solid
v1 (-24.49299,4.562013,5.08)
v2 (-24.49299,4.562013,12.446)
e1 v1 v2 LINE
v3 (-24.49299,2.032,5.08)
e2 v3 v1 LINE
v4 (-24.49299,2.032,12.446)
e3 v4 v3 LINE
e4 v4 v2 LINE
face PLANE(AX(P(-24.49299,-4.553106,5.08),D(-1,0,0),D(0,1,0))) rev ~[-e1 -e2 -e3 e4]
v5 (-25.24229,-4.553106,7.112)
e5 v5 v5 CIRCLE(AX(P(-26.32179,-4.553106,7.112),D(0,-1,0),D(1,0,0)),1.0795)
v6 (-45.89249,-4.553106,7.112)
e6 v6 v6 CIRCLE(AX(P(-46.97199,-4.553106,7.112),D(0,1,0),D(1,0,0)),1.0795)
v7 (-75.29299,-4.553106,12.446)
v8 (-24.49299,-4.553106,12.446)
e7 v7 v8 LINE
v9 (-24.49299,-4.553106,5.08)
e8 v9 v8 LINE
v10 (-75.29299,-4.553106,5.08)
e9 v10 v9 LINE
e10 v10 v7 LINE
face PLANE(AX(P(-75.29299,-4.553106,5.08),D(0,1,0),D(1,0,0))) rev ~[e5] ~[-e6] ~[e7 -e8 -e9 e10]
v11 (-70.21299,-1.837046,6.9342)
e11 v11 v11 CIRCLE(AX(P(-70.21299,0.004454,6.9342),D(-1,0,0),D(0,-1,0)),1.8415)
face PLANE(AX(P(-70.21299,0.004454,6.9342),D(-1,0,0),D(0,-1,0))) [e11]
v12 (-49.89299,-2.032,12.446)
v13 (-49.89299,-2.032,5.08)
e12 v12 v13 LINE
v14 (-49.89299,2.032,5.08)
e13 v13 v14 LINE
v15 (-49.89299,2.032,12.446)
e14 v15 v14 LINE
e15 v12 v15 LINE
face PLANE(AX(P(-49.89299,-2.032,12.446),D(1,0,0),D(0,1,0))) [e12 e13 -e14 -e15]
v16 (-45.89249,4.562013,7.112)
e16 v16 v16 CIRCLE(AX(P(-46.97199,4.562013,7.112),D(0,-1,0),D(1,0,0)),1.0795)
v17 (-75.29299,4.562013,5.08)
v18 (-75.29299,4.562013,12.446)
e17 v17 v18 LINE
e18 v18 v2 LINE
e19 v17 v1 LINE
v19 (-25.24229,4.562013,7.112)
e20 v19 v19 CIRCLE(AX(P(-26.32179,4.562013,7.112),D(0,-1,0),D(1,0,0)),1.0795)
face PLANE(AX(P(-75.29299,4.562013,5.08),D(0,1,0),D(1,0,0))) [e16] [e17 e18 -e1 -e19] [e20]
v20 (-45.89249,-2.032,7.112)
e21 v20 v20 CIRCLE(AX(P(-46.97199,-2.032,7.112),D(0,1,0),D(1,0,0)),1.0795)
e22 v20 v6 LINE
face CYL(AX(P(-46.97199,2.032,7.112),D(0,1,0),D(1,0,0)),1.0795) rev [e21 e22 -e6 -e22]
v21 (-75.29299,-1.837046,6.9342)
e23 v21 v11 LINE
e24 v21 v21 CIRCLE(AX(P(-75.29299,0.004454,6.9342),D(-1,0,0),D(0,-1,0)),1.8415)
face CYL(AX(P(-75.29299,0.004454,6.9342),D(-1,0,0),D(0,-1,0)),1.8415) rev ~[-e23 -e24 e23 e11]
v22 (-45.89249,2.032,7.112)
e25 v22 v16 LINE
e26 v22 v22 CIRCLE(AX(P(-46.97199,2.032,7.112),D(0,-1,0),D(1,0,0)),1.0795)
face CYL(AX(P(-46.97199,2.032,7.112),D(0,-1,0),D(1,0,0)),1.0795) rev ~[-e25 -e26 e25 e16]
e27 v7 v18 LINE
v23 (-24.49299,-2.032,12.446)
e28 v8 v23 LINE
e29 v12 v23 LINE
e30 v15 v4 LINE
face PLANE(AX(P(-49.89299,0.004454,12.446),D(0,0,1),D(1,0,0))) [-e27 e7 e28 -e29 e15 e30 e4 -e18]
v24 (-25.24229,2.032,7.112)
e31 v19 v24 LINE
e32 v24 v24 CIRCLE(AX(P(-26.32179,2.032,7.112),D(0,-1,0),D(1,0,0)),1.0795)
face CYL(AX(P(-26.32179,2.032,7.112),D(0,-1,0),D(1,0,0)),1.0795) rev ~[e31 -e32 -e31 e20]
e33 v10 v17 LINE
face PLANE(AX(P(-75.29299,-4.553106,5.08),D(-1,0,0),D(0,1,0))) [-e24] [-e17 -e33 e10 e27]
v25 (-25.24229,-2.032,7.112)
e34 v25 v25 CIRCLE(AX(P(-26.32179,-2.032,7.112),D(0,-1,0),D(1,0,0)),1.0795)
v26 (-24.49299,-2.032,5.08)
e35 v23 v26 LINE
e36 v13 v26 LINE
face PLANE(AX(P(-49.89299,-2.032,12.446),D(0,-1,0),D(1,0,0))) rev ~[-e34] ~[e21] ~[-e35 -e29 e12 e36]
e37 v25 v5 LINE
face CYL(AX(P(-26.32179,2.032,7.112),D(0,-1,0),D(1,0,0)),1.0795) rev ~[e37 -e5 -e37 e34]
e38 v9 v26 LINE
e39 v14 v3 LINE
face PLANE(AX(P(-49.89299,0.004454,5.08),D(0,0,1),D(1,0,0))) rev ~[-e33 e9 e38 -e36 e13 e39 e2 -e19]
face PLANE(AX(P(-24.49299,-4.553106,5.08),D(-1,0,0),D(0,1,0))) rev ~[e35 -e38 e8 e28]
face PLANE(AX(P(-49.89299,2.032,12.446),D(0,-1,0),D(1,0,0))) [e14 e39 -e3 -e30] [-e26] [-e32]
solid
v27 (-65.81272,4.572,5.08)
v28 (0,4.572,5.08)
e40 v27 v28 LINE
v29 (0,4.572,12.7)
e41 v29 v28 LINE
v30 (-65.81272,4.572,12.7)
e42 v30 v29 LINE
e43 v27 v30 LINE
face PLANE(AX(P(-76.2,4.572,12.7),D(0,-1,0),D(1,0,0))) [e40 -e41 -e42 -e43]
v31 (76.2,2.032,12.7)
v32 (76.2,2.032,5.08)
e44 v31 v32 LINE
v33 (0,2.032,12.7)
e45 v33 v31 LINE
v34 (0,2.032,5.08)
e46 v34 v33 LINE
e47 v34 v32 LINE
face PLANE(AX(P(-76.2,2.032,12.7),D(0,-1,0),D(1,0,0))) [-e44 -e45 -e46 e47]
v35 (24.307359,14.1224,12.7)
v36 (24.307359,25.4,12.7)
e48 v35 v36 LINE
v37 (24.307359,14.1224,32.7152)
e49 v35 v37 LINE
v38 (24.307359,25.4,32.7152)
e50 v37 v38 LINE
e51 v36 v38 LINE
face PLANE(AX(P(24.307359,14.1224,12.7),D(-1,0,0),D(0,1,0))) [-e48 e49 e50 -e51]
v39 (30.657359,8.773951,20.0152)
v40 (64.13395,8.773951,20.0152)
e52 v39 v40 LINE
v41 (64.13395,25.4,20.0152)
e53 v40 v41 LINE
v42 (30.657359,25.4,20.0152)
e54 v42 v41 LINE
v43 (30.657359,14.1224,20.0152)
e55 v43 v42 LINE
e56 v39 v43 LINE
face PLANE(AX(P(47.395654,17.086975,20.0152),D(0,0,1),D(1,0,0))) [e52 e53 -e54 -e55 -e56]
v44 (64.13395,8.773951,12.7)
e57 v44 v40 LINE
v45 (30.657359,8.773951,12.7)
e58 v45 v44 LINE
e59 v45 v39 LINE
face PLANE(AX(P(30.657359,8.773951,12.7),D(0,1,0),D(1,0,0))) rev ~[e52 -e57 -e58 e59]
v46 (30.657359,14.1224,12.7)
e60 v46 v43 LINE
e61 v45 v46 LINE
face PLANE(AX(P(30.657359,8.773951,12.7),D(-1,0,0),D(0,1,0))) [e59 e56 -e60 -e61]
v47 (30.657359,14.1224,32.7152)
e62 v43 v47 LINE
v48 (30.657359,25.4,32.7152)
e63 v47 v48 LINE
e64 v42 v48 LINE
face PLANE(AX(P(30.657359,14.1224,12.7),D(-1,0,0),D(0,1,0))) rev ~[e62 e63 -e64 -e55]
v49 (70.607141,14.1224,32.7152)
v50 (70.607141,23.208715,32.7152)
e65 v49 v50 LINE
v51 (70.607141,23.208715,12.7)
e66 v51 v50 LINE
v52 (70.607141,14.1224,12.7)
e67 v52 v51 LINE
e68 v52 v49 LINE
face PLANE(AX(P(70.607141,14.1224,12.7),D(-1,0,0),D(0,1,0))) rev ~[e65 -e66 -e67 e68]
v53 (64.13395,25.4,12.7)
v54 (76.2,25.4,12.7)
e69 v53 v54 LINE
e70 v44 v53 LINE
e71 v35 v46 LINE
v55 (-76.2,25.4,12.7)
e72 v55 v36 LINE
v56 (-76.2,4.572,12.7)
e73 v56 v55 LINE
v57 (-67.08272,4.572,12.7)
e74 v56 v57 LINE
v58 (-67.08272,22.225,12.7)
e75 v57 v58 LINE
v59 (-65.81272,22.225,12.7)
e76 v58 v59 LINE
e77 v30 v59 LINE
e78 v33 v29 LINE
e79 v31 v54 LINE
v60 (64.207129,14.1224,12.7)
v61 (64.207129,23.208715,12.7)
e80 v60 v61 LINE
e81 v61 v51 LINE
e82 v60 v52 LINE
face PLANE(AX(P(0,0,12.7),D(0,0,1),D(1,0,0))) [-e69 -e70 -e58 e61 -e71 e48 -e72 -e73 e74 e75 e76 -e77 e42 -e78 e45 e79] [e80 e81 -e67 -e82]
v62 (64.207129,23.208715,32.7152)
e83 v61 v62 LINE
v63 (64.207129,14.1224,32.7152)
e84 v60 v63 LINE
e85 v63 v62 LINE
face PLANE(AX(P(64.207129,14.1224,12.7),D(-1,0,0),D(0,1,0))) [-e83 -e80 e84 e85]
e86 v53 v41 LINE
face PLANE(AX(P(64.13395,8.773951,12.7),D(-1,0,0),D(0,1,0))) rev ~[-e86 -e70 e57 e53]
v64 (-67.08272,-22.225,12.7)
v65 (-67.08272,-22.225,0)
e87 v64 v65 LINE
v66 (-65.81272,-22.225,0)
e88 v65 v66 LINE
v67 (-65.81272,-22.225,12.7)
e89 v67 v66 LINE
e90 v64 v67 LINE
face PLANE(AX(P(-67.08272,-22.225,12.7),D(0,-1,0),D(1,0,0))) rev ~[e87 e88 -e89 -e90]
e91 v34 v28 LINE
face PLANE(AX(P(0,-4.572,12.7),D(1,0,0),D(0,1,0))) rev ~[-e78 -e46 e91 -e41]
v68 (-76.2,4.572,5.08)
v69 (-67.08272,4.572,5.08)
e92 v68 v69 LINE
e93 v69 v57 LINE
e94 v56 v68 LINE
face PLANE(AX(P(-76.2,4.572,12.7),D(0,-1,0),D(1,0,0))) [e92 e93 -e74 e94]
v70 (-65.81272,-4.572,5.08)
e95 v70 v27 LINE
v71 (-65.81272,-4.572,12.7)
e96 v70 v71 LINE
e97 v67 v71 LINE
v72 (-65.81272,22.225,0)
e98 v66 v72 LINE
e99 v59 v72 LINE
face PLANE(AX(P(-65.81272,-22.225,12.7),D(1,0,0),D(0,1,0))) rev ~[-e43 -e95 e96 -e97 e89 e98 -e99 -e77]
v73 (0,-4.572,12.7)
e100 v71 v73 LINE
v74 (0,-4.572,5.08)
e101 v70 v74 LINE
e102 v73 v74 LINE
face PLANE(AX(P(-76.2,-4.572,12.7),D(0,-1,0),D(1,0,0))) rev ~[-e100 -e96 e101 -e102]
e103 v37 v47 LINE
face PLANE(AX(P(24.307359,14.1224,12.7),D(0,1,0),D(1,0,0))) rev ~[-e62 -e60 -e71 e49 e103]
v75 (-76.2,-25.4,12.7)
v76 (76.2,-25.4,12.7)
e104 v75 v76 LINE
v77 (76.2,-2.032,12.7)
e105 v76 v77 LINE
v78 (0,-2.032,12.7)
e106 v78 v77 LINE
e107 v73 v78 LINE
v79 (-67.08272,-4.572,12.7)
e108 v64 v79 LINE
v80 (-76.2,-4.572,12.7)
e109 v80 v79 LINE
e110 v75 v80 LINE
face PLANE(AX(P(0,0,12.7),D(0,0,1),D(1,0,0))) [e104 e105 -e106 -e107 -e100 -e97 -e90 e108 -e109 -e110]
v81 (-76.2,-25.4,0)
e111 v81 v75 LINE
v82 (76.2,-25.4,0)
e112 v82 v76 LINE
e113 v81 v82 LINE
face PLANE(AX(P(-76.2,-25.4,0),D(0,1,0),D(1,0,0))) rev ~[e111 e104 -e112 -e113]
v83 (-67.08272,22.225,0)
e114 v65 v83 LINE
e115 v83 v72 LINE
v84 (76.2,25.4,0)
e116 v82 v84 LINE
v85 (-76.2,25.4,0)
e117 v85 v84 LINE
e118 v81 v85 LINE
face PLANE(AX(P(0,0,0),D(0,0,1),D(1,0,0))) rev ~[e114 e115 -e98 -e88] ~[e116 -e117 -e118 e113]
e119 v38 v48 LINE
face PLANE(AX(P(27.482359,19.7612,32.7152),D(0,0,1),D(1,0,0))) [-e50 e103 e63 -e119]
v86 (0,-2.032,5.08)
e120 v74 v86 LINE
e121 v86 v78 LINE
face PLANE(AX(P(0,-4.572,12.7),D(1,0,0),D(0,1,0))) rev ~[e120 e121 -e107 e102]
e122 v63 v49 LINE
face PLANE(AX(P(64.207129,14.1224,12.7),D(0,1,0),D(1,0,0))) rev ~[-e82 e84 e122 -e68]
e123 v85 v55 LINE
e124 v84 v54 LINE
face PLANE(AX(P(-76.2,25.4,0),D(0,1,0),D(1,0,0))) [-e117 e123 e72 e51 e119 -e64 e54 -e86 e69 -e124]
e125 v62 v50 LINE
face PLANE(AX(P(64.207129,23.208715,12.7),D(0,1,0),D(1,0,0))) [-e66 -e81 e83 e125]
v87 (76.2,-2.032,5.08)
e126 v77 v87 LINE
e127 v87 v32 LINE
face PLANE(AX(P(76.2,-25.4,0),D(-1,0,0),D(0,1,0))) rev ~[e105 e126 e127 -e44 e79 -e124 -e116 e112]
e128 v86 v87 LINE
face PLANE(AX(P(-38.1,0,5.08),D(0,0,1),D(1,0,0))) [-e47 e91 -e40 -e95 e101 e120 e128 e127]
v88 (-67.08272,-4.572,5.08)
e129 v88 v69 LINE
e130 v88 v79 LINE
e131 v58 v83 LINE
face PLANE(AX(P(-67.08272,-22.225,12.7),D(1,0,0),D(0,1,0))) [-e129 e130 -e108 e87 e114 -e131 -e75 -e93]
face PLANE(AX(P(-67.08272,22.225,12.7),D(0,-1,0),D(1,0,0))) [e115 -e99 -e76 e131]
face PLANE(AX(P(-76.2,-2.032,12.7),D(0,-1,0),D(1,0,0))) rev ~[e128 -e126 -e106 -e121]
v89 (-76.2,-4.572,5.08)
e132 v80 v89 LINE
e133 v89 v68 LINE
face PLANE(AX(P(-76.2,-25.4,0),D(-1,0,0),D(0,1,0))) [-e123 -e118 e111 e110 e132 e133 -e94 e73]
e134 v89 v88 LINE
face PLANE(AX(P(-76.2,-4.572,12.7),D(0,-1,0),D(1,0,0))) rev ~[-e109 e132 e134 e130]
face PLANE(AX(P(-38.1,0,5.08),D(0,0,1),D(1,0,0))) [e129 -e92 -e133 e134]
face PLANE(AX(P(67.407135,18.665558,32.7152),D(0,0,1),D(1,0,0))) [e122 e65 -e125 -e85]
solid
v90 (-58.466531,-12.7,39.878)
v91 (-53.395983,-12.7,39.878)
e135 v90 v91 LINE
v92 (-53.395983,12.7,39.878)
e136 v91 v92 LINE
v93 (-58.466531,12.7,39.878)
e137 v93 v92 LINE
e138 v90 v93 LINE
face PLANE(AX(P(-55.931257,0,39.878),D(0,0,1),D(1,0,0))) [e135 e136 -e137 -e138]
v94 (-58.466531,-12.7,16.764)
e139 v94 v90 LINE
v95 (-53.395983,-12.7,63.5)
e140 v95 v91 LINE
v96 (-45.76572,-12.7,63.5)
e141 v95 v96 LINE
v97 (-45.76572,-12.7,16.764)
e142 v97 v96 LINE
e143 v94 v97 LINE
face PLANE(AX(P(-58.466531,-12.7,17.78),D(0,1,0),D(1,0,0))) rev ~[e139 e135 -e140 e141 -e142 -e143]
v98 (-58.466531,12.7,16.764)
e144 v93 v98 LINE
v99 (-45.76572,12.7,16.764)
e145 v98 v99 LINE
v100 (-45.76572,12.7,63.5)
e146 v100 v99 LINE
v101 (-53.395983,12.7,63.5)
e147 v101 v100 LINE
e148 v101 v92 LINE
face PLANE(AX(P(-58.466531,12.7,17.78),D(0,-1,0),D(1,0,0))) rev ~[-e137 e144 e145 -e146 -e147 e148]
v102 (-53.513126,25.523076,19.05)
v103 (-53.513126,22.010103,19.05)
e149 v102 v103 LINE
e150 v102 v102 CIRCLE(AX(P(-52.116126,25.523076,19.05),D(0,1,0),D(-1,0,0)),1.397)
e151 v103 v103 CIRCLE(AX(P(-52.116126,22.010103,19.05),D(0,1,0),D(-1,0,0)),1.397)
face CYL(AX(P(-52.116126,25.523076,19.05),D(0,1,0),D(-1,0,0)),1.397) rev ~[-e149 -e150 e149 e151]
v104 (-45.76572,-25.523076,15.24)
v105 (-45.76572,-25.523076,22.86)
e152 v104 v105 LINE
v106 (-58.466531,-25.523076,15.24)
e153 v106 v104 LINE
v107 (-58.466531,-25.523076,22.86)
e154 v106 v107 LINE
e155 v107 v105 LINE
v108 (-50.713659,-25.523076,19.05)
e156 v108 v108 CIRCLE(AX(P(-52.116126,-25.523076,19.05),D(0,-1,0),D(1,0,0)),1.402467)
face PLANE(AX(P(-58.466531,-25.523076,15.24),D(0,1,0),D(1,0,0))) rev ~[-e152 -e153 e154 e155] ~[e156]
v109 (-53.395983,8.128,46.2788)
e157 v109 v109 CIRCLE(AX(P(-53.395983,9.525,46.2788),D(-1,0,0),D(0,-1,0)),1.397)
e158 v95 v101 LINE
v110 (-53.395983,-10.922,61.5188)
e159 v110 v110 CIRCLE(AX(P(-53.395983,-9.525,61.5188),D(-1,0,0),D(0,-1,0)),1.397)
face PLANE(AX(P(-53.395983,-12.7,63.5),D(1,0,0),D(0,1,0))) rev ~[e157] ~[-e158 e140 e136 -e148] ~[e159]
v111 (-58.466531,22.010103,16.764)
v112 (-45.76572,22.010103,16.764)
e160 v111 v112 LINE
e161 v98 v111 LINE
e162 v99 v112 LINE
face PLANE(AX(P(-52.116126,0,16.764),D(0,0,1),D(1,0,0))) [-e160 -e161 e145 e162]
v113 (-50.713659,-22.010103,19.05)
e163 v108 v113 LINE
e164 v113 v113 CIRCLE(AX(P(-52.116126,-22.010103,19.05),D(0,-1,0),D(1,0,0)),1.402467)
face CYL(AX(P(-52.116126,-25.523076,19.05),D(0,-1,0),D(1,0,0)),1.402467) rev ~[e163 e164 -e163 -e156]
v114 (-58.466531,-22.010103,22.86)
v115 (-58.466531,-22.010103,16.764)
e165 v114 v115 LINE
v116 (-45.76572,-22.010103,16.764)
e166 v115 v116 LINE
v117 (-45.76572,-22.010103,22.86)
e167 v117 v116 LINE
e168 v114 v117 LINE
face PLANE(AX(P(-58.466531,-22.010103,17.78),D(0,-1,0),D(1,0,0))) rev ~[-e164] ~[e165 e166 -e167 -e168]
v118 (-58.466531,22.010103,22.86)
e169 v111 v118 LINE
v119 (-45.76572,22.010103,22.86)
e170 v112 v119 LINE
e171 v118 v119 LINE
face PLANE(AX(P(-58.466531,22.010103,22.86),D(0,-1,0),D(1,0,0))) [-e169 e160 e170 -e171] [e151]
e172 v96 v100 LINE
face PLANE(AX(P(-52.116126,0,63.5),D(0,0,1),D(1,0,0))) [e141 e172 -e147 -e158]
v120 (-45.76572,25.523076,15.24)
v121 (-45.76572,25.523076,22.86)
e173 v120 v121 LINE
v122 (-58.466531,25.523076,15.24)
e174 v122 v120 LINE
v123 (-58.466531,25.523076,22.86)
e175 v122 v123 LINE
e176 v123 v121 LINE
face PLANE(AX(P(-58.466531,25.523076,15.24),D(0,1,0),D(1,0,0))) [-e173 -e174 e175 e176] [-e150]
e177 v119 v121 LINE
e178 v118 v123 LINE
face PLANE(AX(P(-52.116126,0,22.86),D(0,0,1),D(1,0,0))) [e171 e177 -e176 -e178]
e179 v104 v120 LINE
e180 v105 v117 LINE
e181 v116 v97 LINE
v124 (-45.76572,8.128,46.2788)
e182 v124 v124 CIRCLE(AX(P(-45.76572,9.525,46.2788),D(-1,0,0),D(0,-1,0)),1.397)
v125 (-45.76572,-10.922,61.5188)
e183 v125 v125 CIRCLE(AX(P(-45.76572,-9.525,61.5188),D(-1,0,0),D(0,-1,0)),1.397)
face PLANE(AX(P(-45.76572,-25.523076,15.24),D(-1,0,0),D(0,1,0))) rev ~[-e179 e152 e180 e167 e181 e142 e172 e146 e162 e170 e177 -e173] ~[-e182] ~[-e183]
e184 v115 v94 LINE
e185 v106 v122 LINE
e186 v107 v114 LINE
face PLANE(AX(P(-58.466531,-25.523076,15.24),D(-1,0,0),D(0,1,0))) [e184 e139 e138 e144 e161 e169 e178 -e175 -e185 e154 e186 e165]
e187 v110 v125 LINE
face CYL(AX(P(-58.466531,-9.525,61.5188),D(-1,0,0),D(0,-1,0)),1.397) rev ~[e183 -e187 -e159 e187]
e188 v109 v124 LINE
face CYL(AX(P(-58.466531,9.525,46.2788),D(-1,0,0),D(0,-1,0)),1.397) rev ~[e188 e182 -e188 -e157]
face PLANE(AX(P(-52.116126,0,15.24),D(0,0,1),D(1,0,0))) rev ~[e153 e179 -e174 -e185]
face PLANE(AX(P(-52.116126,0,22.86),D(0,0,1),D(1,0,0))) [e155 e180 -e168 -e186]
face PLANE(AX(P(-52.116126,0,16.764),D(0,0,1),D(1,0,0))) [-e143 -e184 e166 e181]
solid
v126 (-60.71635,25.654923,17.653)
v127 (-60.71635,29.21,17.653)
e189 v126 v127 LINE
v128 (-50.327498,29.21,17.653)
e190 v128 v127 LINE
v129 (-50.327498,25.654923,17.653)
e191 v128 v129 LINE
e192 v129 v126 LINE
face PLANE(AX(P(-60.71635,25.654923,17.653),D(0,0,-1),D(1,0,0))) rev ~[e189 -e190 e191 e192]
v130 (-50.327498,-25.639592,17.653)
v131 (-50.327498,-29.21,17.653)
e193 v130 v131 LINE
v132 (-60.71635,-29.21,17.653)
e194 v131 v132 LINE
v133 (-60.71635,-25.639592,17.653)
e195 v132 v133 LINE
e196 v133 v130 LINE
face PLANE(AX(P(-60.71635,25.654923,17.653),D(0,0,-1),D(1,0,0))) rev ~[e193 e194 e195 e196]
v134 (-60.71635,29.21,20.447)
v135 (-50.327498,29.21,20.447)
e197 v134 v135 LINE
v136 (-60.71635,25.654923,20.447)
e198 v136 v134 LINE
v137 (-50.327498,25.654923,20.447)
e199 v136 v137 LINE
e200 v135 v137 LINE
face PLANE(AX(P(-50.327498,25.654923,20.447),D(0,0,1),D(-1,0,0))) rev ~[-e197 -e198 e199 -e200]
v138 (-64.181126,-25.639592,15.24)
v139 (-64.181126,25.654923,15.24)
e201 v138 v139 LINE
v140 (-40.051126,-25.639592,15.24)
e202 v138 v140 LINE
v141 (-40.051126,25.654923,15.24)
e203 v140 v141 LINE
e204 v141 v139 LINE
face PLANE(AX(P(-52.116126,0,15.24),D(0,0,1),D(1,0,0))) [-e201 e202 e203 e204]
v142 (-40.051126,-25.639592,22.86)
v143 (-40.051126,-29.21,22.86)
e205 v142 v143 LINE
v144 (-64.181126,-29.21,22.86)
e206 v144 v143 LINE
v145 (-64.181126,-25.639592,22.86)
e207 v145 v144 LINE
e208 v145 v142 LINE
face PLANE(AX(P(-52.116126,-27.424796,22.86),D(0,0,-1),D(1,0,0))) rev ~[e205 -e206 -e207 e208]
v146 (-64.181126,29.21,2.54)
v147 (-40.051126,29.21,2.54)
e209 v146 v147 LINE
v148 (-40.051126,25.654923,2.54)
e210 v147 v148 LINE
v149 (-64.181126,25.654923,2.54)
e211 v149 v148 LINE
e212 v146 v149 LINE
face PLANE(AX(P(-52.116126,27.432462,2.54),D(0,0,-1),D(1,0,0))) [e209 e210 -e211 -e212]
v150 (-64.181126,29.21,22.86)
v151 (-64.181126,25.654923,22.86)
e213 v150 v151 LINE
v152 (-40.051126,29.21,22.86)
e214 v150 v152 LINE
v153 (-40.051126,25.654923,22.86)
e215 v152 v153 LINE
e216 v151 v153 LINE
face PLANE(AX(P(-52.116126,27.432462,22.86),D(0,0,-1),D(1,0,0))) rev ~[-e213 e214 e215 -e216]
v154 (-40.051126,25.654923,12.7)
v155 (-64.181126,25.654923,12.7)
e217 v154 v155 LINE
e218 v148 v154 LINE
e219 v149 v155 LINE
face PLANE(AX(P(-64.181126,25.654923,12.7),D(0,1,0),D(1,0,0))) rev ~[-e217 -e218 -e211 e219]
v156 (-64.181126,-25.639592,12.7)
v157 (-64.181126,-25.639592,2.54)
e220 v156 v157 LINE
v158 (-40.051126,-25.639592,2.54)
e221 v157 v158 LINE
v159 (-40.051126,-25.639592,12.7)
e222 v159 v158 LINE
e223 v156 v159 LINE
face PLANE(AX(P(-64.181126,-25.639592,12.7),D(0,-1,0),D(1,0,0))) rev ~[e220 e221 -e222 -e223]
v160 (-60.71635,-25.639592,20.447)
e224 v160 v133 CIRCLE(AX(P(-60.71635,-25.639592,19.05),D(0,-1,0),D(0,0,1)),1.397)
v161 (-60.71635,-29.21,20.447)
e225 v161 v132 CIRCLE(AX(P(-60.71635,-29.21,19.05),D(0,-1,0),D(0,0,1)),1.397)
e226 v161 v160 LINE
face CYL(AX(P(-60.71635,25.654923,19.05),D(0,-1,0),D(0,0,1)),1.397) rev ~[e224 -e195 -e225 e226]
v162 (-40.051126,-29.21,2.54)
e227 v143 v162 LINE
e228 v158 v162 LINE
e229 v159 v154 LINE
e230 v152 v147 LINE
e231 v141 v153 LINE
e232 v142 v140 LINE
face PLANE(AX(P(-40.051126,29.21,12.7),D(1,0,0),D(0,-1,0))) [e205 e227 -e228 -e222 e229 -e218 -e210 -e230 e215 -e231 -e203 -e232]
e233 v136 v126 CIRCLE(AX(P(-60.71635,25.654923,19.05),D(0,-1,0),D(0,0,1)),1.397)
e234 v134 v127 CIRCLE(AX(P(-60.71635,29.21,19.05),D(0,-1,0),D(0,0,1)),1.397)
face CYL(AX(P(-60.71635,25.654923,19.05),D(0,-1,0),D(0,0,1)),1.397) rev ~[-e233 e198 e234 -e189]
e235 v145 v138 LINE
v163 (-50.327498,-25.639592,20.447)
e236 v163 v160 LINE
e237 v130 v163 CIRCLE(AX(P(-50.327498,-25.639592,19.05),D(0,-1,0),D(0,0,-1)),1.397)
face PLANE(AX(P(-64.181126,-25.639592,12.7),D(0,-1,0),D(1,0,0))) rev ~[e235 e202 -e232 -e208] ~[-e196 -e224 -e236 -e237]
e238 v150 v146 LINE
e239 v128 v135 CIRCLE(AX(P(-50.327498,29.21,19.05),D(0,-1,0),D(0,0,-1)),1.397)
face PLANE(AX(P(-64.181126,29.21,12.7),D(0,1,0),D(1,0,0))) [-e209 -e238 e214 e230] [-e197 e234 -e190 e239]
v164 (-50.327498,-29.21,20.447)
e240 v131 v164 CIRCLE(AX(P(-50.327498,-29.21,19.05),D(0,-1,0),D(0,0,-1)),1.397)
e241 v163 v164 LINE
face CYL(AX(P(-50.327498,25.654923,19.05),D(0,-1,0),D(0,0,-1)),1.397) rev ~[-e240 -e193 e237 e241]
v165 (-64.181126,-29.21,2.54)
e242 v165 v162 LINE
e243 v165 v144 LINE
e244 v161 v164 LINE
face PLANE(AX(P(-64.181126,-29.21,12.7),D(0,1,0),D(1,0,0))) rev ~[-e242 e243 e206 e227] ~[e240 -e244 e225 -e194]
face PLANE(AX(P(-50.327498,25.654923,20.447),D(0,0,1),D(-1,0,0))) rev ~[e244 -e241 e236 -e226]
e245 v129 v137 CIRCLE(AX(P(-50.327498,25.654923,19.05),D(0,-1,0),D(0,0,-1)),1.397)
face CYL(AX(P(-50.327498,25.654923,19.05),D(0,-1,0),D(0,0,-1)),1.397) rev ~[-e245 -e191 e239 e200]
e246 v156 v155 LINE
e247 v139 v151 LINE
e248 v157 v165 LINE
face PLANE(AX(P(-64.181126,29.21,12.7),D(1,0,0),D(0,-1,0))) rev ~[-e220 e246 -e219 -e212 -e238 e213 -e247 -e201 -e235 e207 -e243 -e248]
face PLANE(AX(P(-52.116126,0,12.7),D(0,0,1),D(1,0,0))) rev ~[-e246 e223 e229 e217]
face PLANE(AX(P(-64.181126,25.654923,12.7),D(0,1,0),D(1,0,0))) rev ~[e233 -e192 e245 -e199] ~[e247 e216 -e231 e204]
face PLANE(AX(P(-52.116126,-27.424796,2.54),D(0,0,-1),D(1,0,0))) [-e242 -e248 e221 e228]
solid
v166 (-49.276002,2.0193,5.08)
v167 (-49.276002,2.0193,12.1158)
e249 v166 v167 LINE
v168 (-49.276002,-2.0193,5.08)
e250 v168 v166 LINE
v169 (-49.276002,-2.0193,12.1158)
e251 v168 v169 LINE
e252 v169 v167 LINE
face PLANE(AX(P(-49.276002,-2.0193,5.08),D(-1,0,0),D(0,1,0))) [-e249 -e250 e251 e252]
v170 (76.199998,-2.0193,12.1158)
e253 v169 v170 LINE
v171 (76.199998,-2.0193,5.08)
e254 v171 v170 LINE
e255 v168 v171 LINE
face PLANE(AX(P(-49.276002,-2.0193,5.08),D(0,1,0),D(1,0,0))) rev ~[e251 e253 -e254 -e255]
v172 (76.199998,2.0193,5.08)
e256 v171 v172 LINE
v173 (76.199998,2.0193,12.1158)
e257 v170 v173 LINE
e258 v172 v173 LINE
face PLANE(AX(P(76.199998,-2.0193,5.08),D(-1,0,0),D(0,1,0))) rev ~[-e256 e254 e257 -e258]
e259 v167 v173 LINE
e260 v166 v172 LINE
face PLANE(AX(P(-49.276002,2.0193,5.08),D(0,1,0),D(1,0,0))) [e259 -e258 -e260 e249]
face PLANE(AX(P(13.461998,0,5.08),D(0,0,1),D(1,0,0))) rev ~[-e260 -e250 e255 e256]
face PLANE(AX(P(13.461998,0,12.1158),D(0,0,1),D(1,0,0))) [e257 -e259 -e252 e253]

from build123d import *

# Parameters (mm, degrees)
F0_W      = 152.4
F0_H      = 50.8
F1_DEPTH  = 12.7
F2_W      = 152.4
F2_H      = 4.064
F3_DEPTH  = 7.62
F4_W      = 125.476
F4_H      = 4.0386
F5_DEPTH  = 7.0358
F6_W      = 76.2
F6_H      = 9.144
F7_DEPTH  = 7.62
F8_W      = 50.8
F8_H      = 9.1151185334
F9_DEPTH  = 7.366
F10_W     = 1.27
F10_H     = 44.45
F11_DEPTH = 25.4
F12_W     = 6.35
F12_H     = 11.2776
F12_W_2   = 6.4000114799
F12_H_2   = 9.0863150216
F13_DEPTH = 20.0152
F14_W     = 33.4765905678
F14_H     = 16.6260491401
F15_DEPTH = 7.3152
F16_W     = 25.4
F16_H     = 4.064
F17_DEPTH = 25.4
F18_R     = 1.8415
F19_DEPTH = 5.08
F20_R     = 1.0795
F21_DEPTH = 25.4
F22_W     = 24.13
F22_H     = 58.42
F23_DEPTH = 2.54
F24_W     = 24.13
F24_H     = 3.5704082614
F24_H_2   = 3.5550768292
F25_DEPTH = 10.16
F27_DEPTH = 140.208
F28_W     = 12.7008110285
F28_H     = 51.0461516678
F29_DEPTH = 7.62
F30_W     = 12.7008110285
F30_H     = 44.0202057362
F31_DEPTH = 5.08
F32_W     = 12.7008110285
F32_H     = 25.4
F33_DEPTH = 45.72
F34_R     = 1.397
F35_DEPTH = 25.4
F36_W     = 5.0705485046
F36_H     = 25.4
F37_DEPTH = 23.622
F40_DEPTH = 1.016
F38_R     = 1.4024669373
F41_DEPTH = 8.5598
F39_R     = 1.397
F42_DEPTH = 7.5438


with BuildPart() as f1:
    # F0 (on Top) → F1 (new body)
    with BuildSketch(Plane.XY):
        Rectangle(F0_W, F0_H)
    extrude(amount=F1_DEPTH)

    # F2 (on face) → F3 (cut)
    with BuildSketch(Plane.XY.offset(12.7)):
        Rectangle(F2_W, F2_H)
    extrude(amount=-F3_DEPTH, mode=Mode.SUBTRACT)

    # F6 (on face) → F7 (cut)
    with BuildSketch(Plane.XY.offset(12.7)):
        with Locations((-38.1, 0)):
            Rectangle(F6_W, F6_H)
    extrude(amount=-F7_DEPTH, mode=Mode.SUBTRACT)

    # F10 (on face) → F11 (cut)
    with BuildSketch(Plane.XY.offset(12.7)):
        with Locations((-66.4477199316, 0)):
            Rectangle(F10_W, F10_H)
    extrude(amount=-F11_DEPTH, mode=Mode.SUBTRACT)

    # F12 (on face) → F13 (join)
    with BuildSketch(Plane.XY.offset(12.7)):
        with Locations((27.48235901, 19.7612)):
            Rectangle(F12_W, F12_H)
        with Locations((67.4071349204, 18.6655575108)):
            Rectangle(F12_W_2, F12_H_2)
    extrude(amount=F13_DEPTH)

    # F14 (on face) → F15 (join)
    with BuildSketch(Plane.XY.offset(12.7)):
        with Locations((47.3956542939, 17.08697543)):
            Rectangle(F14_W, F14_H)
    extrude(amount=F15_DEPTH)


with BuildPart() as f5:
    # F4 (on face) → F5 (new body)
    with BuildSketch(Plane.XY.offset(5.08)):
        with Locations((13.4619977325, 0)):
            Rectangle(F4_W, F4_H)
    extrude(amount=F5_DEPTH)


with BuildPart() as f9:
    # F8 (on face) → F9 (new body)
    with BuildSketch(Plane.XY.offset(5.08)):
        with Locations((-49.8929896116, 0.0044535846)):
            Rectangle(F8_W, F8_H)
    extrude(amount=F9_DEPTH)

    # F16 (on face) → F17 (cut)
    with BuildSketch(Plane.XY.offset(12.446)):
        with Locations((-37.1929896116, 0)):
            Rectangle(F16_W, F16_H)
    extrude(amount=-F17_DEPTH, mode=Mode.SUBTRACT)

    # F18 (on face) → F19 (cut)
    with BuildSketch(Plane(origin=(-75.2929896116, 0, 0), x_dir=(0, -1, 0), z_dir=(-1, 0, 0))):
        with Locations((-0.0044535846, 6.9342)):
            Circle(F18_R)
    extrude(amount=-F19_DEPTH, mode=Mode.SUBTRACT)

    # F20 (on face) → F21 (cut, symmetric)
    with BuildSketch(Plane.XZ.offset(-2.032)):
        with Locations((-46.9719896116, 7.112)):
            Circle(F20_R)
        with Locations((-26.3217896116, 7.112)):
            Circle(F20_R)
    extrude(amount=F21_DEPTH, both=True, mode=Mode.SUBTRACT)


with BuildPart() as f23:
    # F22 (on face) → F23 (new body)
    with BuildSketch(Plane.XY.offset(12.7)):
        with Locations((-52.1161258221, 0)):
            Rectangle(F22_W, F22_H)
    extrude(amount=F23_DEPTH)

    # F24 (on face) → F25 (join, symmetric)
    with BuildSketch(Plane(origin=(0, 0, 12.7), x_dir=(1, 0, 0), z_dir=(0, 0, -1))):
        with Locations((-52.1161258221, 27.4247958693)):
            Rectangle(F24_W, F24_H)
        with Locations((-52.1161258221, -27.4324615854)):
            Rectangle(F24_W, F24_H_2)
    extrude(amount=F25_DEPTH, both=True)

    # F26 (on face) → F27 (cut, symmetric)
    with BuildSketch(Plane.XZ.offset(-25.6549231708)):
        with BuildLine():
            ThreePointArc((-60.7163496315, 17.653), (-59.7285214582, 18.0621718267), (-59.3193496315, 19.05))
            ThreePointArc((-59.3193496315, 19.05), (-59.7285214582, 20.0378281733), (-60.7163496315, 20.447))
            Line((-60.7163496315, 20.447), (-60.7163496315, 17.653))
        make_face()
        with BuildLine():
            ThreePointArc((-60.7163496315, 20.447), (-59.7285214582, 20.0378281733), (-59.3193496315, 19.05))
            ThreePointArc((-59.3193496315, 19.05), (-59.7285214582, 18.0621718267), (-60.7163496315, 17.653))
            Line((-60.7163496315, 17.653), (-50.3274984658, 17.653))
            ThreePointArc((-50.3274984658, 17.653), (-51.7244984658, 19.05), (-50.3274984658, 20.447))
            Line((-50.3274984658, 20.447), (-60.7163496315, 20.447))
        make_face()
        with BuildLine():
            Line((-60.7163496315, 17.653), (-60.7163496315, 20.447))
            ThreePointArc((-60.7163496315, 20.447), (-62.1133496315, 19.05), (-60.7163496315, 17.653))
        make_face()
        with BuildLine():
            Line((-50.3274984658, 17.653), (-50.3274984658, 20.447))
            ThreePointArc((-50.3274984658, 20.447), (-51.7244984658, 19.05), (-50.3274984658, 17.653))
        make_face()
        with BuildLine():
            ThreePointArc((-48.9304984658, 19.05), (-49.3396702925, 20.0378281733), (-50.3274984658, 20.447))
            Line((-50.3274984658, 20.447), (-50.3274984658, 17.653))
            ThreePointArc((-50.3274984658, 17.653), (-49.3396702925, 18.0621718267), (-48.9304984658, 19.05))
        make_face()
    extrude(amount=F27_DEPTH, both=True, mode=Mode.SUBTRACT)


with BuildPart() as f29:
    # F28 (on face) → F29 (new body)
    with BuildSketch(Plane.XY.offset(15.24)):
        with Locations((-52.1161258221, 0)):
            Rectangle(F28_W, F28_H)
    extrude(amount=F29_DEPTH)

    # F30 (on face) → F31 (cut)
    with BuildSketch(Plane.XY.offset(22.86)):
        with Locations((-52.1161258221, 0)):
            Rectangle(F30_W, F30_H)
    extrude(amount=-F31_DEPTH, mode=Mode.SUBTRACT)

    # F32 (on face) → F33 (join)
    with BuildSketch(Plane.XY.offset(17.78)):
        with Locations((-52.1161258221, 0)):
            Rectangle(F32_W, F32_H)
    extrude(amount=F33_DEPTH)

    # F34 (on face) → F35 (cut)
    with BuildSketch(Plane(origin=(-58.4665313363, 0, 0), x_dir=(0, -1, 0), z_dir=(-1, 0, 0))):
        with Locations((9.525, 61.5188)):
            Circle(F34_R)
        with Locations((-9.525, 46.2788)):
            Circle(F34_R)
    extrude(amount=-F35_DEPTH, mode=Mode.SUBTRACT)

    # F36 (on face) → F37 (cut)
    with BuildSketch(Plane.XY.offset(63.5)):
        with Locations((-55.931257084, 0)):
            Rectangle(F36_W, F36_H)
    extrude(amount=-F37_DEPTH, mode=Mode.SUBTRACT)

    # F40 (cut): faces of the model
    f40_faces = [f29.faces().sort_by_distance(p)[0] for p in [
        (-52.1161258221, 17.355051434, 17.78),
        (-52.1161258221, -17.355051434, 17.78),
    ]]
    extrude(f40_faces, amount=-F40_DEPTH, mode=Mode.SUBTRACT)

    # F38 (on face) → F41 (cut)
    with BuildSketch(Plane.XZ.offset(25.5230758339)):
        with Locations((-52.1161258221, 19.05)):
            Circle(F38_R)
    extrude(amount=-F41_DEPTH, mode=Mode.SUBTRACT)

    # F39 (on face) → F42 (cut)
    with BuildSketch(Plane(origin=(0, 25.5230758339, 0), x_dir=(-1, 0, 0), z_dir=(0, 1, 0))):
        with Locations((52.1161258221, 19.05)):
            Circle(F39_R)
    extrude(amount=-F42_DEPTH, mode=Mode.SUBTRACT)


solid = Compound([f1.part, f5.part, f9.part, f23.part, f29.part])
